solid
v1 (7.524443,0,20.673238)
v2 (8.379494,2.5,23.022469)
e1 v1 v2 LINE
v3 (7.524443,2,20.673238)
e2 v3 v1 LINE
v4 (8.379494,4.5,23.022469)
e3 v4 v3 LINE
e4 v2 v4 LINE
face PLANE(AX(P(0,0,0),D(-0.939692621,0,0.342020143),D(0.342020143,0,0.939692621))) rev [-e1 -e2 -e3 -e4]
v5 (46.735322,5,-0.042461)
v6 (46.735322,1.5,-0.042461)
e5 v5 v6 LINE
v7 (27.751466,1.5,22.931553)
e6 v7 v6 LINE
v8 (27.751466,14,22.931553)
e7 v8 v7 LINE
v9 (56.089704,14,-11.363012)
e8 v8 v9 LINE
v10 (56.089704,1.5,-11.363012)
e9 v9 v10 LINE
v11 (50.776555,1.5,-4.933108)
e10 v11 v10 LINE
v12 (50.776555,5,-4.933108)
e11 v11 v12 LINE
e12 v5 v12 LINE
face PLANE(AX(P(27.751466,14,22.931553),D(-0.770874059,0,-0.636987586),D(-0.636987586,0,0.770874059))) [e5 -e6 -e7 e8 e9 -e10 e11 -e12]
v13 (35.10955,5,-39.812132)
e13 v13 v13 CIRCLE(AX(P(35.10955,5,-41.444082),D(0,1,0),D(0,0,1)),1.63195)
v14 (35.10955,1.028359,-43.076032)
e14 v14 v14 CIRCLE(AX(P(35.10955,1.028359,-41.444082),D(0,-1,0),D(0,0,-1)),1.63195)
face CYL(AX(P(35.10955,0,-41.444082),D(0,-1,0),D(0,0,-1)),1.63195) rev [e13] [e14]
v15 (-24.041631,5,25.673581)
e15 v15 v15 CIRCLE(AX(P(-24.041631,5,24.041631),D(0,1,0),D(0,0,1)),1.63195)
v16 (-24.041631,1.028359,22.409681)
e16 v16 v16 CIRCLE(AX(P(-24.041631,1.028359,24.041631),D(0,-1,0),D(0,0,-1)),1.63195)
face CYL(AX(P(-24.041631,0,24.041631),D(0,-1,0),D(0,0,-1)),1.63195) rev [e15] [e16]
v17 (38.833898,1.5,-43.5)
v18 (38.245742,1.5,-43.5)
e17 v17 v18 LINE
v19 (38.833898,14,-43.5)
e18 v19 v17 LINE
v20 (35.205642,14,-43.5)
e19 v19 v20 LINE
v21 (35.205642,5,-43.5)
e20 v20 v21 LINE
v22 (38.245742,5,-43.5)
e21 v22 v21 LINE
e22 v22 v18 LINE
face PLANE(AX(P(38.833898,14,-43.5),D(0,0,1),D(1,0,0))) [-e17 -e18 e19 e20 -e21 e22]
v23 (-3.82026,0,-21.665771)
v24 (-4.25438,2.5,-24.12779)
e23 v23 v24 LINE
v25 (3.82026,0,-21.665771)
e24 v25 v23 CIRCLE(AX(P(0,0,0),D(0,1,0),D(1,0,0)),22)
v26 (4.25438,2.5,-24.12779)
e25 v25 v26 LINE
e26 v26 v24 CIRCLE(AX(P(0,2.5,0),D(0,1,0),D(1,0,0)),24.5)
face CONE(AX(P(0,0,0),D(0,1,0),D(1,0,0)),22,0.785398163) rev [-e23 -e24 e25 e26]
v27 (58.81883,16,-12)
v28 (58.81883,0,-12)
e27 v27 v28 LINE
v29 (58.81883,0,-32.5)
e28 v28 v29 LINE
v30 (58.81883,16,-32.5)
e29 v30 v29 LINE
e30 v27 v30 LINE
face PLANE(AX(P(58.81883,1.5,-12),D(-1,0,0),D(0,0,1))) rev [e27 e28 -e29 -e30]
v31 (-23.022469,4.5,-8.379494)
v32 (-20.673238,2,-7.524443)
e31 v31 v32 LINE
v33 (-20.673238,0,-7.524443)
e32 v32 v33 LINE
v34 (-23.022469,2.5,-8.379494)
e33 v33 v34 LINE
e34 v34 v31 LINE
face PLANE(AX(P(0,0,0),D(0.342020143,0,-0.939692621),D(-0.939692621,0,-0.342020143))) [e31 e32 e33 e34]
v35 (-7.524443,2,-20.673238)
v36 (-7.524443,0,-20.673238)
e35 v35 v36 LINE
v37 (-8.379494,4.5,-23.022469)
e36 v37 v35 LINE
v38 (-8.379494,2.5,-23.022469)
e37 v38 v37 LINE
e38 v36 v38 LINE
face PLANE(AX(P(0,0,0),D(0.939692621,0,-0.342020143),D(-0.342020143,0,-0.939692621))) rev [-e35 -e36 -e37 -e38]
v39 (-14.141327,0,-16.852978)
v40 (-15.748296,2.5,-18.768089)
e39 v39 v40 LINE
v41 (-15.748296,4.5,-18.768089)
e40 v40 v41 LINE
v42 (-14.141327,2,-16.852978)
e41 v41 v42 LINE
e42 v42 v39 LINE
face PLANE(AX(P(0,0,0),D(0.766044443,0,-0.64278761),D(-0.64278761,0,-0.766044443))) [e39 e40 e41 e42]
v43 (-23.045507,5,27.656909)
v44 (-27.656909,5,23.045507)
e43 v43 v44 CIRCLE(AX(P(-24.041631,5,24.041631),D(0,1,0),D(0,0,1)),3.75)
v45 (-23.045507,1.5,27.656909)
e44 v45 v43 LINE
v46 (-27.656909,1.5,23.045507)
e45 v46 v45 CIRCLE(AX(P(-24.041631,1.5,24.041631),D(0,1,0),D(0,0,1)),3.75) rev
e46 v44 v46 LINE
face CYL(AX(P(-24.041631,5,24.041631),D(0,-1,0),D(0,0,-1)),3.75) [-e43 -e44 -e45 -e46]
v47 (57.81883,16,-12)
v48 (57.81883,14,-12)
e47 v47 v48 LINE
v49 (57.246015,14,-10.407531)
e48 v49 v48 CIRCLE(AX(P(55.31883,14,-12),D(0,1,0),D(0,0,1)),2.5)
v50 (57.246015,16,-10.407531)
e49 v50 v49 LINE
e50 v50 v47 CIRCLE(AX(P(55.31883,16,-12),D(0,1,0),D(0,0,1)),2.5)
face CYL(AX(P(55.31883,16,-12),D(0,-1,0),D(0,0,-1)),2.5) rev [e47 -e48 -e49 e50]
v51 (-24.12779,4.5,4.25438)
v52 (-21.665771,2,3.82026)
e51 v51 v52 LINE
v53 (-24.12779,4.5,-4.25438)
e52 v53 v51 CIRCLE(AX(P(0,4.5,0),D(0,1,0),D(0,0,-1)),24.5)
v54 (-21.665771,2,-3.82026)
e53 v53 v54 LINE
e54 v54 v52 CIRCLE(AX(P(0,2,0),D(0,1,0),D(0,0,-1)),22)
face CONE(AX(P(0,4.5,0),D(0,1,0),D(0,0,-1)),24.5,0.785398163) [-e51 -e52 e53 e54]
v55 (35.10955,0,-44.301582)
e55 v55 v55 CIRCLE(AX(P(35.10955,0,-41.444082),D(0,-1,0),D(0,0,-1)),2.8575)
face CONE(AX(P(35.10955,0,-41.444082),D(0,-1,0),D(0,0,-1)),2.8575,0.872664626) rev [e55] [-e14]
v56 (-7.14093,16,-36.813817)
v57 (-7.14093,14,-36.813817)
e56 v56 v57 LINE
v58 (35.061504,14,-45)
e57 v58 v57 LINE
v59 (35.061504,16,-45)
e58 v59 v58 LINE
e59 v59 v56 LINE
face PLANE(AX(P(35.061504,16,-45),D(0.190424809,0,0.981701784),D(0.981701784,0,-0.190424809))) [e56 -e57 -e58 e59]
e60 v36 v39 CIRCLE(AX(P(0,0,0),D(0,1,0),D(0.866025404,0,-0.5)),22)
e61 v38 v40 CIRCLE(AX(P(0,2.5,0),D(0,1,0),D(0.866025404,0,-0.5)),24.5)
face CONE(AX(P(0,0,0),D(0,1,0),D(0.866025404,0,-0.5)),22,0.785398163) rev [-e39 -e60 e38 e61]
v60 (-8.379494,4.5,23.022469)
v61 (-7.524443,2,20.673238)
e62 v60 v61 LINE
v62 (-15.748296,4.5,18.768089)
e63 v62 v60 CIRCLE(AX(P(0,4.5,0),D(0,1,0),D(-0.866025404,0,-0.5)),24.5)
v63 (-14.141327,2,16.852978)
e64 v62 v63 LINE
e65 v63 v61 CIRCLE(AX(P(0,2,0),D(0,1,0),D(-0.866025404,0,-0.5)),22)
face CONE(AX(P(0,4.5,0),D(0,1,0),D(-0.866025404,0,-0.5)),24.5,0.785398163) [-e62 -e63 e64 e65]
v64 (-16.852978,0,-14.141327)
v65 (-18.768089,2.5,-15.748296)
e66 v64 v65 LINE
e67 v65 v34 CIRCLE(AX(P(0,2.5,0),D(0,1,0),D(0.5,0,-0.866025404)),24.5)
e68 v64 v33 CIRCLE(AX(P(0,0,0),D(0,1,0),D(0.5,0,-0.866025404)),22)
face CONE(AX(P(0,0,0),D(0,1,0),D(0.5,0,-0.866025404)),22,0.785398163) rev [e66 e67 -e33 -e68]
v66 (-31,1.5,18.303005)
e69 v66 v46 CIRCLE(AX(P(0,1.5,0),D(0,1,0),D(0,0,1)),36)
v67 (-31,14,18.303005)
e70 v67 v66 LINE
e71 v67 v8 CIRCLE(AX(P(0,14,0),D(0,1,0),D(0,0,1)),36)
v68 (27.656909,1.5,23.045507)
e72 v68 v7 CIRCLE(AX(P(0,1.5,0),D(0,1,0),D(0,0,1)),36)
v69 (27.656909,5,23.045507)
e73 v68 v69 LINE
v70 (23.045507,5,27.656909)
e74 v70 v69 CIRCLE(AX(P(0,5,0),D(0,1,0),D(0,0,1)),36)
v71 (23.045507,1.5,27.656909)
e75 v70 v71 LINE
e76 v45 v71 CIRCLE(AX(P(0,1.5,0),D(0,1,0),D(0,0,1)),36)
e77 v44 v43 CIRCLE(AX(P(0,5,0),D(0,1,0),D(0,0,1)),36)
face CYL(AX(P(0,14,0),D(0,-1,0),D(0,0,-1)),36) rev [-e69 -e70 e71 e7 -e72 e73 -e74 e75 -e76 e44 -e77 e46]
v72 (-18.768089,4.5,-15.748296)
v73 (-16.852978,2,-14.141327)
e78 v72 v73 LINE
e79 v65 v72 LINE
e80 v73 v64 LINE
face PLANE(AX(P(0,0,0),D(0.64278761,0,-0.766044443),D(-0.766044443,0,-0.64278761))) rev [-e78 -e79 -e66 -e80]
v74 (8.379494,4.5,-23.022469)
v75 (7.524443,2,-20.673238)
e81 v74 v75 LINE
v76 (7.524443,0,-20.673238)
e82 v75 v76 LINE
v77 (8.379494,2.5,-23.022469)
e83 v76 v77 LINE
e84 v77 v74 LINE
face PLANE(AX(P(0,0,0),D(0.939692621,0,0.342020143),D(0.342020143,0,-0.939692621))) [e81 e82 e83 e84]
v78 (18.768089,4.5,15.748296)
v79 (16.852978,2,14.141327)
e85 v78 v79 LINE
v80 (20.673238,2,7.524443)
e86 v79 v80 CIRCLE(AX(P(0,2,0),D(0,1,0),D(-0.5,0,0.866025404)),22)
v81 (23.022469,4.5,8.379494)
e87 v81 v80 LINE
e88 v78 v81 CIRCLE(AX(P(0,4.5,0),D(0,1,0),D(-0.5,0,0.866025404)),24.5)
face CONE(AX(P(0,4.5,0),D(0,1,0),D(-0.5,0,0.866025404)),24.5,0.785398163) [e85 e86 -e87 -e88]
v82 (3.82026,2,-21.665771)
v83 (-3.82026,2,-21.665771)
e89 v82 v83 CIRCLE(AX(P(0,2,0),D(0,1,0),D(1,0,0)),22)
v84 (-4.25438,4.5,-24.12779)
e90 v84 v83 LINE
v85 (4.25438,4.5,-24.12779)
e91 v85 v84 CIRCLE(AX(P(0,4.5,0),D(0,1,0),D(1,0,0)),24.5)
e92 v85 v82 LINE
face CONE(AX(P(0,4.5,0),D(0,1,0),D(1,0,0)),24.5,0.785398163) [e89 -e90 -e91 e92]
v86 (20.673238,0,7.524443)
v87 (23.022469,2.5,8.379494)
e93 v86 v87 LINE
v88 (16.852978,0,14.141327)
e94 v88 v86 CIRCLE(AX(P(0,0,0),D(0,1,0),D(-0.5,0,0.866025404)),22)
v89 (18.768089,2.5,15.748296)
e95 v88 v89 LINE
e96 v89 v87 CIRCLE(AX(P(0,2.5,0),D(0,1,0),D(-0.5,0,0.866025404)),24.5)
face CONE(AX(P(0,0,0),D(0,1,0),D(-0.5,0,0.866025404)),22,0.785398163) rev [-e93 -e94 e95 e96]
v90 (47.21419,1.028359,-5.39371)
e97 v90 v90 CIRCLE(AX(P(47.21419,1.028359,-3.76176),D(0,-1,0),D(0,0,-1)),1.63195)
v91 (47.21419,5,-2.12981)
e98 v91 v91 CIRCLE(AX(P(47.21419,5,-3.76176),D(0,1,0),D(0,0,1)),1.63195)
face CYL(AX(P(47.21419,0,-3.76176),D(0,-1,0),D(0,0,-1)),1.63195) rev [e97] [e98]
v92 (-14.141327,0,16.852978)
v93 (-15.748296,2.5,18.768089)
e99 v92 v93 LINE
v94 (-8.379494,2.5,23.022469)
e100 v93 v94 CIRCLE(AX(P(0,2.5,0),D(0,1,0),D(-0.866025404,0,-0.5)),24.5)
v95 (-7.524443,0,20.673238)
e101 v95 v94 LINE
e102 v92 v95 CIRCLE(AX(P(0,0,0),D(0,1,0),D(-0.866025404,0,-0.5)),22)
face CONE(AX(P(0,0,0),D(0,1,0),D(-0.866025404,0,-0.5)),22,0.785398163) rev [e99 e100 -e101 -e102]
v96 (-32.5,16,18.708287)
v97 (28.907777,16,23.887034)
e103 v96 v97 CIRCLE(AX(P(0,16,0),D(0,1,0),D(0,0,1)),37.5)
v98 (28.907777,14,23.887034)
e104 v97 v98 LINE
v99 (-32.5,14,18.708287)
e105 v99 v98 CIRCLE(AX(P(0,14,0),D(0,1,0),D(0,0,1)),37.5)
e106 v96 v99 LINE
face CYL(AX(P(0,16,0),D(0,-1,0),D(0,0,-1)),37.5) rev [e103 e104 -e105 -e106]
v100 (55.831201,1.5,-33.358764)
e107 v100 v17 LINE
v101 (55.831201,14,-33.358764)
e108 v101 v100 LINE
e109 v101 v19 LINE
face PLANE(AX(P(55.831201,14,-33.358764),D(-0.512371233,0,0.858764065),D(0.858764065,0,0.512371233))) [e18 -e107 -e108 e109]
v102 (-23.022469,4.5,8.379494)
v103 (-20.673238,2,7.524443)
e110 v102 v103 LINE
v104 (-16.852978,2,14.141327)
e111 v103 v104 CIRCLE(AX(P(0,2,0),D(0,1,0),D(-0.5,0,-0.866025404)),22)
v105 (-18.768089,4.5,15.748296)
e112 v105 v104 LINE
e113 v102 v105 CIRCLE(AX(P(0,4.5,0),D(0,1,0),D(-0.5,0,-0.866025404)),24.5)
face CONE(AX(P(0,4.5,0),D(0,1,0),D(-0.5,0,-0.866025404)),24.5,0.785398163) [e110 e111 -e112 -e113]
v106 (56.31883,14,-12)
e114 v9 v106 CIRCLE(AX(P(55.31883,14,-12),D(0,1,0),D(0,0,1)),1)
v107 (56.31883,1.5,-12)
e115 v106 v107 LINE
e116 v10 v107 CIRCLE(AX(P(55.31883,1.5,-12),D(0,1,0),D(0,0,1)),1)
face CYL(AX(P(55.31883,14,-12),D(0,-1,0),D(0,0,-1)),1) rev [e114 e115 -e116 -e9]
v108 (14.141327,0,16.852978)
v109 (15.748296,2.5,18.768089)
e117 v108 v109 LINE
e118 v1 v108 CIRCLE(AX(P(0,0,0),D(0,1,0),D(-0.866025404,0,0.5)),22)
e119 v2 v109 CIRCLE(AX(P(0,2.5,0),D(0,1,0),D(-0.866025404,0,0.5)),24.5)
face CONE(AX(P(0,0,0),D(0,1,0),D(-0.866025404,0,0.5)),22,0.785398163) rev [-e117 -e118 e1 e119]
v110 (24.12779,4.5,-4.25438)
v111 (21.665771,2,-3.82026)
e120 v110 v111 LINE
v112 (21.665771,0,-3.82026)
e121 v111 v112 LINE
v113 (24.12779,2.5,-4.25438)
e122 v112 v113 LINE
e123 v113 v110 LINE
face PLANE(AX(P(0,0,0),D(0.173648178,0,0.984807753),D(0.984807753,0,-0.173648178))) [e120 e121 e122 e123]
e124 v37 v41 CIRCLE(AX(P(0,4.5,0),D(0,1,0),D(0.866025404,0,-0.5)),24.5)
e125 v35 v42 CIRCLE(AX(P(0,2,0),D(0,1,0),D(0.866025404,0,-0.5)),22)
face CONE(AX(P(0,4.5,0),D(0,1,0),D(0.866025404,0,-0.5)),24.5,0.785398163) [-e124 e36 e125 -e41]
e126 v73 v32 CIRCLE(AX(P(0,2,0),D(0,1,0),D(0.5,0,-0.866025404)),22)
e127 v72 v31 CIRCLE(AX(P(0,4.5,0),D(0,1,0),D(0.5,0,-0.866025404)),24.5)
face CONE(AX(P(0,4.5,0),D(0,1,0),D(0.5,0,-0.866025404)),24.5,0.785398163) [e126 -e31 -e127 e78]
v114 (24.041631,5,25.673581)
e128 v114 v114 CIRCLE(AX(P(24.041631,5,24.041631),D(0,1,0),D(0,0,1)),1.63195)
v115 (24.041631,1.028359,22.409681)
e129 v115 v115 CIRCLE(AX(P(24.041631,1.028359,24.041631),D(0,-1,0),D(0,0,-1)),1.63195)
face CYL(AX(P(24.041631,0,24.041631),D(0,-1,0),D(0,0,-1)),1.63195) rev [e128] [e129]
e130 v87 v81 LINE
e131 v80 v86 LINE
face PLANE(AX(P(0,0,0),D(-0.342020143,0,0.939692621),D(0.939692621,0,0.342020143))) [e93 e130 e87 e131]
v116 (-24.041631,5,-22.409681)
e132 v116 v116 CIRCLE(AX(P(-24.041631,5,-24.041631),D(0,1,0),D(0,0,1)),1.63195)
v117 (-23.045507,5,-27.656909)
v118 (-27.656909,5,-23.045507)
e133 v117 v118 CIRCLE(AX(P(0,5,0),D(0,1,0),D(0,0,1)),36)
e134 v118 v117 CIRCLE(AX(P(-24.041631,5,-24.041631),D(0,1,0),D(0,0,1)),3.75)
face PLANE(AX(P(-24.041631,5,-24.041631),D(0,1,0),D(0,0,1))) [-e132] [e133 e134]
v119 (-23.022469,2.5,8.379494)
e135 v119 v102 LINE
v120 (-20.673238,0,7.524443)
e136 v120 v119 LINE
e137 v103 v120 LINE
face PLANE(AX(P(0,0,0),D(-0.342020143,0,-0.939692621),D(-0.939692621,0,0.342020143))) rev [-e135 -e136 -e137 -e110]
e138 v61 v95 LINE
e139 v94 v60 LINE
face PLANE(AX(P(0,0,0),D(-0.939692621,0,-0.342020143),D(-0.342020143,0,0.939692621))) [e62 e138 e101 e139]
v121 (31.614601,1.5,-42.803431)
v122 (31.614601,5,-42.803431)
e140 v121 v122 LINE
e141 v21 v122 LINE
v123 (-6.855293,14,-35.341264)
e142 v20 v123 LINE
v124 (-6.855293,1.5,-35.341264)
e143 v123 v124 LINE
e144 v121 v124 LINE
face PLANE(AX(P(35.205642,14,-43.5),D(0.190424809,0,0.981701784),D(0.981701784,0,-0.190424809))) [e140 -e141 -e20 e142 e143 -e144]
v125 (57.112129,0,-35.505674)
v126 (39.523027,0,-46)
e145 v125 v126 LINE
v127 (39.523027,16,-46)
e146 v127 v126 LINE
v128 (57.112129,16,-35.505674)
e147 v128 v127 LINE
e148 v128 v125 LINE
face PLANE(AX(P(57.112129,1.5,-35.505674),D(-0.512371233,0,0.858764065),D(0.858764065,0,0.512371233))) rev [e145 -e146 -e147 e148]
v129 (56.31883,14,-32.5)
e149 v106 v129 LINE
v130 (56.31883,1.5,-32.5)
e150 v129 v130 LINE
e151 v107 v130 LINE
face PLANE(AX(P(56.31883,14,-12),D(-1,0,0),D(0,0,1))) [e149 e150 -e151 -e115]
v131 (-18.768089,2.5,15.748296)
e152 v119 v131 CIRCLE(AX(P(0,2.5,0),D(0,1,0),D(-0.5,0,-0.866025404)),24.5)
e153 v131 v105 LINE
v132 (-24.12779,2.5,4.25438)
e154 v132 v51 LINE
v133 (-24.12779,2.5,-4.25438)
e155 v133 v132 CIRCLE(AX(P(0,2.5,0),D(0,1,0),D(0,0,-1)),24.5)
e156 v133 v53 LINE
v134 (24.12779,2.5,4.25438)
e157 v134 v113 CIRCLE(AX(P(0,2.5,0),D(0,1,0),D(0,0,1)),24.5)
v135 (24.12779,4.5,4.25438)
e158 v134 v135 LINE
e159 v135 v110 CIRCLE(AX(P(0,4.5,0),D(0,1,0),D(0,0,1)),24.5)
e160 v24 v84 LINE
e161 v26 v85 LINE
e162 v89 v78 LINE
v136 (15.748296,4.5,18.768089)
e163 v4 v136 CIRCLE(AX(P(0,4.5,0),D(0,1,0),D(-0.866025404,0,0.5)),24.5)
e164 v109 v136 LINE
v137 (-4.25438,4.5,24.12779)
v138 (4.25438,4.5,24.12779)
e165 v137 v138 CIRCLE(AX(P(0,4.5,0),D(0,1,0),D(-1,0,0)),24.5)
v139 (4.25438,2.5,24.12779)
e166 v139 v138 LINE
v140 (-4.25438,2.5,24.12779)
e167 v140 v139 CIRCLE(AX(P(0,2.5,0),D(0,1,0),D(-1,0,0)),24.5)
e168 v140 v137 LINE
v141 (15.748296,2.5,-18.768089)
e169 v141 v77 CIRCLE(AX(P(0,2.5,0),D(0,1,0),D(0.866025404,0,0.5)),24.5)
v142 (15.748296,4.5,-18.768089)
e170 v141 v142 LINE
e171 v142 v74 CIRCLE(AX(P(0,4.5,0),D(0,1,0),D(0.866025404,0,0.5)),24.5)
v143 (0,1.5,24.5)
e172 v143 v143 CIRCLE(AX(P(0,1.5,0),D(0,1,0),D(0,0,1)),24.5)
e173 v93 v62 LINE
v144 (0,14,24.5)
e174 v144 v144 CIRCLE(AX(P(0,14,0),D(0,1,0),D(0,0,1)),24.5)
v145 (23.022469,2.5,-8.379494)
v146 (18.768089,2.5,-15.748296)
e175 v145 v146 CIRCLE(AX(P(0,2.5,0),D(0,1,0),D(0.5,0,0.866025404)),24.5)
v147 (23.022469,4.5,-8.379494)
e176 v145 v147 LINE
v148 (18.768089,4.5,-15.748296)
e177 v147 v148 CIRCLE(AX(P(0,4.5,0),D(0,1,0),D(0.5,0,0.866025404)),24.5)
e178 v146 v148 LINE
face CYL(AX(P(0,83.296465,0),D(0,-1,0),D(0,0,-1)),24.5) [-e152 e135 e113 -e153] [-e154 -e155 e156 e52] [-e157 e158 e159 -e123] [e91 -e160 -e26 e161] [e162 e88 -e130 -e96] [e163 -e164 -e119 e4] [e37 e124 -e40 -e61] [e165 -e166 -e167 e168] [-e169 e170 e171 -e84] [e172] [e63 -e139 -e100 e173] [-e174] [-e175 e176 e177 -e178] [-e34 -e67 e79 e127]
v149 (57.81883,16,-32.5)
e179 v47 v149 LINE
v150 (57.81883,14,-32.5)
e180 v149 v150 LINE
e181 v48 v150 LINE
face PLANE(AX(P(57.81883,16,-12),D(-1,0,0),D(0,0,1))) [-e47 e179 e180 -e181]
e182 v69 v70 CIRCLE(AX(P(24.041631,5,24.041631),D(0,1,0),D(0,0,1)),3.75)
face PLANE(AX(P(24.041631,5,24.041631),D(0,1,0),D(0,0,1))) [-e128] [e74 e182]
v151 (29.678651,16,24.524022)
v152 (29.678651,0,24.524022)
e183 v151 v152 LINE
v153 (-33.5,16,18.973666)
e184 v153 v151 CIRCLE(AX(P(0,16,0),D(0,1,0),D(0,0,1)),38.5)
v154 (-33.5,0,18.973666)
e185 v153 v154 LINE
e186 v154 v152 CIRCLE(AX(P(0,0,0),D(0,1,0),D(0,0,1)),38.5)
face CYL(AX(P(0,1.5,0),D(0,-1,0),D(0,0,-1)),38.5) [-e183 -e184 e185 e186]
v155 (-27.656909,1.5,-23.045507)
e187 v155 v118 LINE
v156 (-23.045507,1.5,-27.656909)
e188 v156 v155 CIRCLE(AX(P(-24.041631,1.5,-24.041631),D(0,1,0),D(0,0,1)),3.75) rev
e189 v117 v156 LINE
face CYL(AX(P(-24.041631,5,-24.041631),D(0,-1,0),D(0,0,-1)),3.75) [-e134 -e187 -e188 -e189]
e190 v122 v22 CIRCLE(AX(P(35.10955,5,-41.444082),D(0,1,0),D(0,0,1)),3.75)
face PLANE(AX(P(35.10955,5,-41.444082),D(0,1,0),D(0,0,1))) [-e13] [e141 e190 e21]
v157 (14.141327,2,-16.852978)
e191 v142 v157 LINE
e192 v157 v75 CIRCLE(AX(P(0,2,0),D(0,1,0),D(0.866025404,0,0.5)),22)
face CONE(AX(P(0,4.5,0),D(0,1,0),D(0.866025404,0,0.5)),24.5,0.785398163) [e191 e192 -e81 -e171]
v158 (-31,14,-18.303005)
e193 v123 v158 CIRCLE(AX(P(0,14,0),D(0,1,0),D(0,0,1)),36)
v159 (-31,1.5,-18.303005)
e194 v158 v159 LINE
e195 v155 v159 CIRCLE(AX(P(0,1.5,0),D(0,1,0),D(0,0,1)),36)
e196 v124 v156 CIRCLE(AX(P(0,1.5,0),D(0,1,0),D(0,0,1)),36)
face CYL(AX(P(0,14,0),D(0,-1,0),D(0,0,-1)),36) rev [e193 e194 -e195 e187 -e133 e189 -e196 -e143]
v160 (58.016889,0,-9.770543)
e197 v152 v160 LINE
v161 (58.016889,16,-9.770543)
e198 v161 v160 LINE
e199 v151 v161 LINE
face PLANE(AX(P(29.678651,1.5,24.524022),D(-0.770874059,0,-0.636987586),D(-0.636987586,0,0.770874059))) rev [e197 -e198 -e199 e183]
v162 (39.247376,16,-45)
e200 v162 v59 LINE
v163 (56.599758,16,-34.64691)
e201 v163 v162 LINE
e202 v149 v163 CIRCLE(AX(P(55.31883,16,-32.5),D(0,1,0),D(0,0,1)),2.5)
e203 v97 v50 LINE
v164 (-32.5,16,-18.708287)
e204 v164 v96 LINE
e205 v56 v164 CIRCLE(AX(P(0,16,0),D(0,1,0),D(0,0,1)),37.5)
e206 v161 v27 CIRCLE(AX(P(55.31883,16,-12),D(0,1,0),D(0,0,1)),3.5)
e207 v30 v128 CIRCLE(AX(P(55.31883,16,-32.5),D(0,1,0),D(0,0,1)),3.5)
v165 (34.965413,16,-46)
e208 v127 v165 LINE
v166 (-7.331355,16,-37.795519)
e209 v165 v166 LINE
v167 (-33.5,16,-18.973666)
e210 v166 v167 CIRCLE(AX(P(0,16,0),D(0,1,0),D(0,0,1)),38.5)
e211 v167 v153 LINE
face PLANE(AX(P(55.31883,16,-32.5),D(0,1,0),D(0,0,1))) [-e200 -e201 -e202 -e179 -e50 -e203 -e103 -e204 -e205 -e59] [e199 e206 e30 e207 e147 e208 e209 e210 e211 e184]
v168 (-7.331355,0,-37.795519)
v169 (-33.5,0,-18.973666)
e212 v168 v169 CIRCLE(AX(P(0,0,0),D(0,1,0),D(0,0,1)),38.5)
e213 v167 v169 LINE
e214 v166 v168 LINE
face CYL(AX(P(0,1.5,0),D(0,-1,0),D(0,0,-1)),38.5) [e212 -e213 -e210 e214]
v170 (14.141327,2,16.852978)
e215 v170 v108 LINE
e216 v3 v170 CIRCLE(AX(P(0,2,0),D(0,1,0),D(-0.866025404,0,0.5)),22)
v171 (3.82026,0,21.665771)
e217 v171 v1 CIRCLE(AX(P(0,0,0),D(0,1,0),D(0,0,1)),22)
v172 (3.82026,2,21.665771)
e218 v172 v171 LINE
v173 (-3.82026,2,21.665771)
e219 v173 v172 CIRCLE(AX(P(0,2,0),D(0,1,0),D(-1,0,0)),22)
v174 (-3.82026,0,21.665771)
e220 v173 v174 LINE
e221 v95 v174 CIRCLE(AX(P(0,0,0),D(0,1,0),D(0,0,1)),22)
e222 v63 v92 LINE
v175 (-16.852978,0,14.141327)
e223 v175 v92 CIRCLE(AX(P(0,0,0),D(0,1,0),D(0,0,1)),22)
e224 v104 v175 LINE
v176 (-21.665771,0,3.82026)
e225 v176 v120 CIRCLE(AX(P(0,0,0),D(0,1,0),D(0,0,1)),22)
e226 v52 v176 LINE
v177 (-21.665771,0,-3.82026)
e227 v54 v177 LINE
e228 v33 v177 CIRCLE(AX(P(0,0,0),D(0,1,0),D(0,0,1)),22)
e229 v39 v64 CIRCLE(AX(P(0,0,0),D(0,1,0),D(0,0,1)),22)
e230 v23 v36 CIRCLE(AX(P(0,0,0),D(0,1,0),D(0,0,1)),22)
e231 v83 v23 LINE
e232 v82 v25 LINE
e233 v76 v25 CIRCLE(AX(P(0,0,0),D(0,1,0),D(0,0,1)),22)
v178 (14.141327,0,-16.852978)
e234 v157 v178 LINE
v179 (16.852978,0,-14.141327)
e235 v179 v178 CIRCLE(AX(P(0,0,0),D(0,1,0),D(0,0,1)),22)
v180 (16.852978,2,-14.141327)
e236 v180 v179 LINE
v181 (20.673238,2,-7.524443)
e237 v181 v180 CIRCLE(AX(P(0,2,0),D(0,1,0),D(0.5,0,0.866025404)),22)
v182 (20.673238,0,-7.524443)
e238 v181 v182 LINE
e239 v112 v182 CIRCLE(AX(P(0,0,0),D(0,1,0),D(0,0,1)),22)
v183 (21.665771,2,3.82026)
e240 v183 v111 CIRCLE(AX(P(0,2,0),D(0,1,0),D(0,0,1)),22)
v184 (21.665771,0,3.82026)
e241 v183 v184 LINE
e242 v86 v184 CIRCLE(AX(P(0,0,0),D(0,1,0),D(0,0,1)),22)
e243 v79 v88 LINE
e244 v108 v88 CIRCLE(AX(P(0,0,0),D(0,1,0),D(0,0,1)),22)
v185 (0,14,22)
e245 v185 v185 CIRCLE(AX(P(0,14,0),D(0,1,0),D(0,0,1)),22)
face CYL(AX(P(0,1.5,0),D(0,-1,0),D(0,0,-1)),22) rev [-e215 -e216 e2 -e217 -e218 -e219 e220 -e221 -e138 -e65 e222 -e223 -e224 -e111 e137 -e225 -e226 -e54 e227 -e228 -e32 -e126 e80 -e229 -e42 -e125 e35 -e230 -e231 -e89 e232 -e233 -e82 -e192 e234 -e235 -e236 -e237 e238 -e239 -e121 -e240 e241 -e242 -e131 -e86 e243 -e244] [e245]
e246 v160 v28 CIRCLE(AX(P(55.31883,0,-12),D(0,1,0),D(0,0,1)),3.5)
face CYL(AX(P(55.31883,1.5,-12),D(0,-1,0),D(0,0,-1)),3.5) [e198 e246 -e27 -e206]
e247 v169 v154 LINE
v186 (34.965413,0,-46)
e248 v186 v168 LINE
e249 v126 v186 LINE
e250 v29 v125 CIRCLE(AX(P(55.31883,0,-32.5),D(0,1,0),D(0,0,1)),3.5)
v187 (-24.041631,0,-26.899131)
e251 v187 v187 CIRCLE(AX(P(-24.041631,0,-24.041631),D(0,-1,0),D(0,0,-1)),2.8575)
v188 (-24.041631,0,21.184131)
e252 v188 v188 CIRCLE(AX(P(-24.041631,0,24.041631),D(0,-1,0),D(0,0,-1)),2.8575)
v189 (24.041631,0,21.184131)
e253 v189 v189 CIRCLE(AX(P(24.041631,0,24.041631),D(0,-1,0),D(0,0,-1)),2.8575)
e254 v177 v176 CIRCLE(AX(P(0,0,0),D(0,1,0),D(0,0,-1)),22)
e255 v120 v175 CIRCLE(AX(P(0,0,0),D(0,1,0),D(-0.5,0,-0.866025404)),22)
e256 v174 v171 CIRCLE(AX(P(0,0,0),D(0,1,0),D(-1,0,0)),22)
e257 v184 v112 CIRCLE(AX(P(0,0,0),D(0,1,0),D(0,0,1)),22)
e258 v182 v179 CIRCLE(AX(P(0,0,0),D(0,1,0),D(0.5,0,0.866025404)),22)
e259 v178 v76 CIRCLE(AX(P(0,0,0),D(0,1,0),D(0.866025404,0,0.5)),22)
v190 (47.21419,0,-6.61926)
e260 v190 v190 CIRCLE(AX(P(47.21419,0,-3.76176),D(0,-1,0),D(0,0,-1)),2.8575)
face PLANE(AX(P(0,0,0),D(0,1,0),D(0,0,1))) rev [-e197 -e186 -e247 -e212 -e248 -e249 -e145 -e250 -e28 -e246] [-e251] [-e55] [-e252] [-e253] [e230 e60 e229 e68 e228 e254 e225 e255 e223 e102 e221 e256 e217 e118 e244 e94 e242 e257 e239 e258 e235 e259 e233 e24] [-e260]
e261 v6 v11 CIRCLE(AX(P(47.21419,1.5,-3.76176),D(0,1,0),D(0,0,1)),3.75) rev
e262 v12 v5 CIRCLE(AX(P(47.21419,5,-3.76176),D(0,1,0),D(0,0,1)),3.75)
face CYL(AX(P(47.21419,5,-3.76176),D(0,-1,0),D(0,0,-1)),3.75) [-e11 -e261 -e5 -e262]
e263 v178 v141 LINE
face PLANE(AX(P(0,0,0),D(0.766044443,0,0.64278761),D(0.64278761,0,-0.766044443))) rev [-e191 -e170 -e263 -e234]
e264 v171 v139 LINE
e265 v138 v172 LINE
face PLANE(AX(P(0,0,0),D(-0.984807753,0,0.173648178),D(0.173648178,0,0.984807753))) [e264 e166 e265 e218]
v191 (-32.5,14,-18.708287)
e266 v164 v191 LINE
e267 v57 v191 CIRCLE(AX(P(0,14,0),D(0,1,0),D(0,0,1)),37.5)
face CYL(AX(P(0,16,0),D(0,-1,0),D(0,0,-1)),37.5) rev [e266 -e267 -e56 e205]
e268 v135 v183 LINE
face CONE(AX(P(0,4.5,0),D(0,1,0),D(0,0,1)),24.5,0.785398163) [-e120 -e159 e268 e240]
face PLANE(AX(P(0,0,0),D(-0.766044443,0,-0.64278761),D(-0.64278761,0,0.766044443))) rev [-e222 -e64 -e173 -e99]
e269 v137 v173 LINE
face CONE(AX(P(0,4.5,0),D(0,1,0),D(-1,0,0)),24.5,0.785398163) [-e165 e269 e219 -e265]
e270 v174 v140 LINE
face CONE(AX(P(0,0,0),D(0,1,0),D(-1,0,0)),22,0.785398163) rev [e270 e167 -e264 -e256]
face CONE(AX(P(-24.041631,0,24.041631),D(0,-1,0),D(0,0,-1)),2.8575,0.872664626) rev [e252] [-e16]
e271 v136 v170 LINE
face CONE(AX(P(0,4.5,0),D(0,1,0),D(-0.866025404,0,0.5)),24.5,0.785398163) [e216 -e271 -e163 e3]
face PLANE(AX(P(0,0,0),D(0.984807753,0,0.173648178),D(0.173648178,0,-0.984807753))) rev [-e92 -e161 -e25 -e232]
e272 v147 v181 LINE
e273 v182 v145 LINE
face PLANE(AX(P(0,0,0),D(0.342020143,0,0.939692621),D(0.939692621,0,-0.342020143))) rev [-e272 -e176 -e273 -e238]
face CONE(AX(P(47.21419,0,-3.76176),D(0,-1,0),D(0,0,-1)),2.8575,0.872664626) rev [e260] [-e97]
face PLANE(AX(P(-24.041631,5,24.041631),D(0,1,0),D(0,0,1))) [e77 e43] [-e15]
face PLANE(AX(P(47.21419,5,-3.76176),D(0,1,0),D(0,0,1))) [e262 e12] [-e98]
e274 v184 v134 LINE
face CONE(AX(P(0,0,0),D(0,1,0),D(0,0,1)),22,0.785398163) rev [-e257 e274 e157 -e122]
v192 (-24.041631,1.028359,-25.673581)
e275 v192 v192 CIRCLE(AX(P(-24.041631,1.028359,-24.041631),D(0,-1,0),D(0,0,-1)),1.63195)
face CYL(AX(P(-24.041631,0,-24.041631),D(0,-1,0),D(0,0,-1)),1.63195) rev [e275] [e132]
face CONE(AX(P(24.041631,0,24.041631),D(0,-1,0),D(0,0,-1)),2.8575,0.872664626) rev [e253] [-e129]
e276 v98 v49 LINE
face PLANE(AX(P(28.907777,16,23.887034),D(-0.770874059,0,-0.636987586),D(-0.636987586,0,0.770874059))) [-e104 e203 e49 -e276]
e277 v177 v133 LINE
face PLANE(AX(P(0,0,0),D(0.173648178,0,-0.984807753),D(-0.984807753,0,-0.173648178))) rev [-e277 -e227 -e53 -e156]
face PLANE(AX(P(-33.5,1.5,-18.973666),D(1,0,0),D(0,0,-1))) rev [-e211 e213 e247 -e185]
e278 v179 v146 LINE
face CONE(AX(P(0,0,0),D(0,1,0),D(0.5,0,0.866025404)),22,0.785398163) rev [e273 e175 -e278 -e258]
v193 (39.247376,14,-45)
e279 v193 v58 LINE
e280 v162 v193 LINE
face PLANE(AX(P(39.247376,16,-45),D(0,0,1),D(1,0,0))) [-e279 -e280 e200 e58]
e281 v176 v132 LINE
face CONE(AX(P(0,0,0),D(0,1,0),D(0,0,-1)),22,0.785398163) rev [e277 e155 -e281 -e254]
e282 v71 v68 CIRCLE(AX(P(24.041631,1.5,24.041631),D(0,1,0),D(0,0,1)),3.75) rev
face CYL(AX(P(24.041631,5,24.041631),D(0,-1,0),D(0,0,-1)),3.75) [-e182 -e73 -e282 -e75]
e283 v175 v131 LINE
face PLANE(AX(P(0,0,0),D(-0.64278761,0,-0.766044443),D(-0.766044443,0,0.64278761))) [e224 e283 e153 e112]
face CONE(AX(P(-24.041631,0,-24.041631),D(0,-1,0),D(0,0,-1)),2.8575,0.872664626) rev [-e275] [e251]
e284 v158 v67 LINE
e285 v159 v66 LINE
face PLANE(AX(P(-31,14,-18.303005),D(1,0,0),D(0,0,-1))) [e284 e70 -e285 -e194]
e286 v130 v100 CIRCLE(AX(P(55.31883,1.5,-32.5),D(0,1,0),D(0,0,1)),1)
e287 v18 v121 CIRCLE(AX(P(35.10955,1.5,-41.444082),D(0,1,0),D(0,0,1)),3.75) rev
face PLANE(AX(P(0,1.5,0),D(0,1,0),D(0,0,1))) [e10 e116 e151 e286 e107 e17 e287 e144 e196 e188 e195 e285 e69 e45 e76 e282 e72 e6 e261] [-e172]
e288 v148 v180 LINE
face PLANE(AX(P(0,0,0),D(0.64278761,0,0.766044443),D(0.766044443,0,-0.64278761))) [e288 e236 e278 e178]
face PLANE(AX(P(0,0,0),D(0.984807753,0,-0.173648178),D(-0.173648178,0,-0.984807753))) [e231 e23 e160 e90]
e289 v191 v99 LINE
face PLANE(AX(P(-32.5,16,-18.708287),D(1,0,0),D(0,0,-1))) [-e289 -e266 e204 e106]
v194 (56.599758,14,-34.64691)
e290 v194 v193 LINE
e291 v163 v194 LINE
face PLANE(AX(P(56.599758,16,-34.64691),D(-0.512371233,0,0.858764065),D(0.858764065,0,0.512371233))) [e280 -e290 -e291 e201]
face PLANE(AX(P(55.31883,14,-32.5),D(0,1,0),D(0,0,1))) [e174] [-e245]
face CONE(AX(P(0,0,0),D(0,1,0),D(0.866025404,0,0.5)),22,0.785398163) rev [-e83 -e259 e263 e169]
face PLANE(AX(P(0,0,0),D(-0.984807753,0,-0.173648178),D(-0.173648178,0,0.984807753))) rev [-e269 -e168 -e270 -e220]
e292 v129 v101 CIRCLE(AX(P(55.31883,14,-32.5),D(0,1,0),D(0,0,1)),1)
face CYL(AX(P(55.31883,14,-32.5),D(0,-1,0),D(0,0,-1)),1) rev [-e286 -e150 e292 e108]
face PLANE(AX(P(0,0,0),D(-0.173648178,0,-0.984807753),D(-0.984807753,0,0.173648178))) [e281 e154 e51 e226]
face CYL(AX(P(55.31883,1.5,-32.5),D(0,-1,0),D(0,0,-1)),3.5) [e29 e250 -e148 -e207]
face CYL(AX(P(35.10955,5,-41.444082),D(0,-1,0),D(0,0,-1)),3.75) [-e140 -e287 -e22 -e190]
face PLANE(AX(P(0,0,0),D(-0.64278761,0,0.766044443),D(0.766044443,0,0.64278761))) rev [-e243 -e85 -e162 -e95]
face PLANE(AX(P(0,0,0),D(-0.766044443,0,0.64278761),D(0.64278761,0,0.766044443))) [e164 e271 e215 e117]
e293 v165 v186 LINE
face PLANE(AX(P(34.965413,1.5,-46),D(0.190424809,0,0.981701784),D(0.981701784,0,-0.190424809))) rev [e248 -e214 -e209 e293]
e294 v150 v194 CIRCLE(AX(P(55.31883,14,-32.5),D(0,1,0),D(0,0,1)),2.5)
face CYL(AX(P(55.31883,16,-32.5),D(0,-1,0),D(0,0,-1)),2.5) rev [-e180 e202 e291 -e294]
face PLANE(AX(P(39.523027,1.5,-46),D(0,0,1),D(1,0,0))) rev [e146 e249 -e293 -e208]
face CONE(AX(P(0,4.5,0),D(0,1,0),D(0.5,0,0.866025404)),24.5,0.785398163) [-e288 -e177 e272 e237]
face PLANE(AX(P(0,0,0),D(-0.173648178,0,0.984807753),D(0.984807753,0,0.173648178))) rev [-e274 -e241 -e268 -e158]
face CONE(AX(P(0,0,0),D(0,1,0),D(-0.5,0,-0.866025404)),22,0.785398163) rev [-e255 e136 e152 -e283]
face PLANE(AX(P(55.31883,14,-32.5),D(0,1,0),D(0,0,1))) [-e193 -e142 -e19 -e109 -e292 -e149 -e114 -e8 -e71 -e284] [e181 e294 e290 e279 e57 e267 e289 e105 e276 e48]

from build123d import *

# Parameters (mm, degrees)
SKETCH3_R                                         = 22
BOSS_EXTRUDE1_DEPTH                               = 1.5
BOSS_EXTRUDE2_DEPTH                               = 12.5
SKETCH5_R                                         = 24.5
SKETCH5_R_2                                       = 22
BOSS_EXTRUDE3_DEPTH                               = 12.5
BOSS_EXTRUDE5_DEPTH                               = 2
CUT_REVOLVE1_ANGLE                                = 20
CIRPATTERN1_COUNT                                 = 12
SKETCH12_R                                        = 3.75
BOSS_EXTRUDE6_DEPTH                               = 5
CSK_FOR_4_FLAT_HEAD_MACHINE_SCREW_100_D           = 3.2639
CSK_FOR_4_FLAT_HEAD_MACHINE_SCREW_100_CSINK_D     = 5.715
CSK_FOR_4_FLAT_HEAD_MACHINE_SCREW_100_CSINK_ANGLE = 100


# Read off the part's stored shape, not the designer's step: Cut-Revolve1
with BuildPart() as part:
    # Sketch3 → Boss-Extrude1 (new body)
    with BuildSketch(Plane(origin=(0, 0, 0), x_dir=(1, 0, 0), z_dir=(0, 1, 0))):
        with BuildLine():
            Line((39.523027355, 46), (34.965412665, 46))
            Line((34.965412665, 46), (-7.331355166, 37.795518669))
            ThreePointArc((-7.331355166, 37.795518669), (-22.480334206, 31.255152759), (-33.5, 18.973665961))
            Line((-33.5, 18.973665961), (-33.5, -18.973665961))
            ThreePointArc((-33.5, -18.973665961), (-3.369315914, -38.35228429), (29.67865128, -24.524022064))
            Line((29.67865128, -24.524022064), (58.016889207, 9.770543449))
            ThreePointArc((58.016889207, 9.770543449), (58.612248226, 10.815349677), (58.81883, 12))
            Line((58.81883, 12), (58.81883, 32.5))
            ThreePointArc((58.81883, 32.5), (58.362392683, 34.228214743), (57.112129316, 35.505674228))
            Line((57.112129316, 35.505674228), (39.523027355, 46))
        make_face()
        with Locations(Location((0, 0, 0), (0, 0, 270))):
            Circle(SKETCH3_R, mode=Mode.SUBTRACT)
    extrude(amount=BOSS_EXTRUDE1_DEPTH)

    # Sketch4 → Boss-Extrude2 (add)
    with BuildSketch(Plane(origin=(0, 1.5, 0), x_dir=(1, 0, 0), z_dir=(0, 1, 0))):
        with BuildLine():
            Line((57.112129316, 35.505674228), (39.523027355, 46))
            Line((39.523027355, 46), (34.965412665, 46))
            Line((34.965412665, 46), (-7.331355166, 37.795518669))
            ThreePointArc((-7.331355166, 37.795518669), (-22.480334206, 31.255152759), (-33.5, 18.973665961))
            Line((-33.5, 18.973665961), (-33.5, -18.973665961))
            ThreePointArc((-33.5, -18.973665961), (-3.369315914, -38.35228429), (29.67865128, -24.524022064))
            Line((29.67865128, -24.524022064), (58.016889207, 9.770543449))
            ThreePointArc((58.016889207, 9.770543449), (58.612248226, 10.815349677), (58.81883, 12))
            Line((58.81883, 12), (58.81883, 32.5))
            ThreePointArc((58.81883, 32.5), (58.362392683, 34.228214743), (57.112129316, 35.505674228))
        make_face()
        with BuildLine():
            Line((55.831201233, 33.358764065), (38.83389843, 43.5))
            Line((38.83389843, 43.5), (35.205641557, 43.5))
            Line((35.205641557, 43.5), (-6.855293142, 35.34126421))
            ThreePointArc((-6.855293142, 35.34126421), (-20.756477834, 29.413748961), (-31, 18.303005218))
            Line((-31, 18.303005218), (-31, -18.303005218))
            ThreePointArc((-31, -18.303005218), (-2.827385178, -35.888798992), (27.751466132, -22.931553099))
            Line((27.751466132, -22.931553099), (56.089704059, 11.363012414))
            ThreePointArc((56.089704059, 11.363012414), (56.259806636, 11.661528479), (56.31883, 12))
            Line((56.31883, 12), (56.31883, 32.5))
            ThreePointArc((56.31883, 32.5), (56.188419338, 32.993775641), (55.831201233, 33.358764065))
        make_face(mode=Mode.SUBTRACT)
    extrude(amount=BOSS_EXTRUDE2_DEPTH)

    # Sketch5 → Boss-Extrude3 (add)
    with BuildSketch(Plane(origin=(0, 1.5, 0), x_dir=(1, 0, 0), z_dir=(0, 1, 0))):
        with Locations(Location((0, 0, 0), (0, 0, 270))):
            Circle(SKETCH5_R)
        with Locations(Location((0, 0, 0), (0, 0, 270))):
            Circle(SKETCH5_R_2, mode=Mode.SUBTRACT)
    extrude(amount=BOSS_EXTRUDE3_DEPTH)

    # Sketch8 → Boss-Extrude5 (add)
    with BuildSketch(Plane(origin=(0, 14, 0), x_dir=(1, 0, 0), z_dir=(0, 1, 0))):
        with BuildLine():
            Line((57.112129316, 35.505674228), (39.523027355, 46))
            Line((39.523027355, 46), (34.965412665, 46))
            Line((34.965412665, 46), (-7.331355166, 37.795518669))
            ThreePointArc((-7.331355166, 37.795518669), (-22.480334206, 31.255152759), (-33.5, 18.973665961))
            Line((-33.5, 18.973665961), (-33.5, -18.973665961))
            ThreePointArc((-33.5, -18.973665961), (-3.369315914, -38.35228429), (29.67865128, -24.524022064))
            Line((29.67865128, -24.524022064), (58.016889207, 9.770543449))
            ThreePointArc((58.016889207, 9.770543449), (58.612248226, 10.815349677), (58.81883, 12))
            Line((58.81883, 12), (58.81883, 32.5))
            ThreePointArc((58.81883, 32.5), (58.362392683, 34.228214743), (57.112129316, 35.505674228))
        make_face()
        with BuildLine():
            Line((35.061504222, 45), (-7.140930356, 36.813816885))
            ThreePointArc((-7.140930356, 36.813816885), (-21.78998379, 30.519610194), (-32.5, 18.708286934))
            Line((-32.5, 18.708286934), (-32.5, -18.708286934))
            ThreePointArc((-32.5, -18.708286934), (-3.151328713, -37.367353764), (28.907777221, -23.887034478))
            Line((28.907777221, -23.887034478), (57.246015148, 10.407531035))
            ThreePointArc((57.246015148, 10.407531035), (57.67127159, 11.153821198), (57.81883, 12))
            Line((57.81883, 12), (57.81883, 32.5))
            ThreePointArc((57.81883, 32.5), (57.492803345, 33.734439102), (56.599758083, 34.646910163))
            Line((56.599758083, 34.646910163), (39.247375785, 45))
            Line((39.247375785, 45), (35.061504222, 45))
        make_face(mode=Mode.SUBTRACT)
    extrude(amount=BOSS_EXTRUDE5_DEPTH)

    # Cut-Revolve1 outline → Cut-Revolve1 (revolve, cut)
    with BuildSketch(Plane(origin=(0, 0, 0), x_dir=(0.984807753012208, 0, 0.17364817766693078), z_dir=(-0.17364817766693078, 0, 0.984807753012208))):
        Polygon((22, 2), (22, 0), (24.5, 2.5), (24.5, 4.5), align=None)
    cut_revolve1 = revolve(axis=Axis((0, 0, 0), (0, 1, 0)), revolution_arc=CUT_REVOLVE1_ANGLE, mode=Mode.SUBTRACT)

    # CirPattern1: Cut-Revolve1 ×12 about axis
    cirpattern1_axis = Axis((0, 0, 0), (0, 1, 0))
    for i in range(1, CIRPATTERN1_COUNT):
        add(cut_revolve1.rotate(cirpattern1_axis, i * 360 / CIRPATTERN1_COUNT), mode=Mode.SUBTRACT)

    # Sketch12 → Boss-Extrude6 (add)
    with BuildSketch(Plane(origin=(0, 0, 0), x_dir=(1, 0, 0), z_dir=(0, 1, 0))):
        with Locations((-24.04163056, 24.04163056)):
            Circle(SKETCH12_R)
        with Locations((-24.04163056, -24.04163056)):
            Circle(SKETCH12_R)
        with Locations((24.04163056, -24.04163056)):
            Circle(SKETCH12_R)
        with Locations((47.21419, 3.761759805)):
            Circle(SKETCH12_R)
        with Locations((35.10955, 41.444082154)):
            Circle(SKETCH12_R)
    extrude(amount=BOSS_EXTRUDE6_DEPTH)

    # CSK for #4 Flat Head Machine Screw (100)1 (through all)
    with Locations(Plane(origin=(0, 0, 0), x_dir=(-1, 0, 0), z_dir=(0, -1, 0))):
        with Locations((-35.10955, 41.444082154), (-47.21419, 3.761759805), (-24.04163056, -24.04163056), (24.04163056, -24.04163056), (24.04163056, 24.04163056)):
            CounterSinkHole(CSK_FOR_4_FLAT_HEAD_MACHINE_SCREW_100_D / 2, CSK_FOR_4_FLAT_HEAD_MACHINE_SCREW_100_CSINK_D / 2, counter_sink_angle=CSK_FOR_4_FLAT_HEAD_MACHINE_SCREW_100_CSINK_ANGLE)


solid = part.part
